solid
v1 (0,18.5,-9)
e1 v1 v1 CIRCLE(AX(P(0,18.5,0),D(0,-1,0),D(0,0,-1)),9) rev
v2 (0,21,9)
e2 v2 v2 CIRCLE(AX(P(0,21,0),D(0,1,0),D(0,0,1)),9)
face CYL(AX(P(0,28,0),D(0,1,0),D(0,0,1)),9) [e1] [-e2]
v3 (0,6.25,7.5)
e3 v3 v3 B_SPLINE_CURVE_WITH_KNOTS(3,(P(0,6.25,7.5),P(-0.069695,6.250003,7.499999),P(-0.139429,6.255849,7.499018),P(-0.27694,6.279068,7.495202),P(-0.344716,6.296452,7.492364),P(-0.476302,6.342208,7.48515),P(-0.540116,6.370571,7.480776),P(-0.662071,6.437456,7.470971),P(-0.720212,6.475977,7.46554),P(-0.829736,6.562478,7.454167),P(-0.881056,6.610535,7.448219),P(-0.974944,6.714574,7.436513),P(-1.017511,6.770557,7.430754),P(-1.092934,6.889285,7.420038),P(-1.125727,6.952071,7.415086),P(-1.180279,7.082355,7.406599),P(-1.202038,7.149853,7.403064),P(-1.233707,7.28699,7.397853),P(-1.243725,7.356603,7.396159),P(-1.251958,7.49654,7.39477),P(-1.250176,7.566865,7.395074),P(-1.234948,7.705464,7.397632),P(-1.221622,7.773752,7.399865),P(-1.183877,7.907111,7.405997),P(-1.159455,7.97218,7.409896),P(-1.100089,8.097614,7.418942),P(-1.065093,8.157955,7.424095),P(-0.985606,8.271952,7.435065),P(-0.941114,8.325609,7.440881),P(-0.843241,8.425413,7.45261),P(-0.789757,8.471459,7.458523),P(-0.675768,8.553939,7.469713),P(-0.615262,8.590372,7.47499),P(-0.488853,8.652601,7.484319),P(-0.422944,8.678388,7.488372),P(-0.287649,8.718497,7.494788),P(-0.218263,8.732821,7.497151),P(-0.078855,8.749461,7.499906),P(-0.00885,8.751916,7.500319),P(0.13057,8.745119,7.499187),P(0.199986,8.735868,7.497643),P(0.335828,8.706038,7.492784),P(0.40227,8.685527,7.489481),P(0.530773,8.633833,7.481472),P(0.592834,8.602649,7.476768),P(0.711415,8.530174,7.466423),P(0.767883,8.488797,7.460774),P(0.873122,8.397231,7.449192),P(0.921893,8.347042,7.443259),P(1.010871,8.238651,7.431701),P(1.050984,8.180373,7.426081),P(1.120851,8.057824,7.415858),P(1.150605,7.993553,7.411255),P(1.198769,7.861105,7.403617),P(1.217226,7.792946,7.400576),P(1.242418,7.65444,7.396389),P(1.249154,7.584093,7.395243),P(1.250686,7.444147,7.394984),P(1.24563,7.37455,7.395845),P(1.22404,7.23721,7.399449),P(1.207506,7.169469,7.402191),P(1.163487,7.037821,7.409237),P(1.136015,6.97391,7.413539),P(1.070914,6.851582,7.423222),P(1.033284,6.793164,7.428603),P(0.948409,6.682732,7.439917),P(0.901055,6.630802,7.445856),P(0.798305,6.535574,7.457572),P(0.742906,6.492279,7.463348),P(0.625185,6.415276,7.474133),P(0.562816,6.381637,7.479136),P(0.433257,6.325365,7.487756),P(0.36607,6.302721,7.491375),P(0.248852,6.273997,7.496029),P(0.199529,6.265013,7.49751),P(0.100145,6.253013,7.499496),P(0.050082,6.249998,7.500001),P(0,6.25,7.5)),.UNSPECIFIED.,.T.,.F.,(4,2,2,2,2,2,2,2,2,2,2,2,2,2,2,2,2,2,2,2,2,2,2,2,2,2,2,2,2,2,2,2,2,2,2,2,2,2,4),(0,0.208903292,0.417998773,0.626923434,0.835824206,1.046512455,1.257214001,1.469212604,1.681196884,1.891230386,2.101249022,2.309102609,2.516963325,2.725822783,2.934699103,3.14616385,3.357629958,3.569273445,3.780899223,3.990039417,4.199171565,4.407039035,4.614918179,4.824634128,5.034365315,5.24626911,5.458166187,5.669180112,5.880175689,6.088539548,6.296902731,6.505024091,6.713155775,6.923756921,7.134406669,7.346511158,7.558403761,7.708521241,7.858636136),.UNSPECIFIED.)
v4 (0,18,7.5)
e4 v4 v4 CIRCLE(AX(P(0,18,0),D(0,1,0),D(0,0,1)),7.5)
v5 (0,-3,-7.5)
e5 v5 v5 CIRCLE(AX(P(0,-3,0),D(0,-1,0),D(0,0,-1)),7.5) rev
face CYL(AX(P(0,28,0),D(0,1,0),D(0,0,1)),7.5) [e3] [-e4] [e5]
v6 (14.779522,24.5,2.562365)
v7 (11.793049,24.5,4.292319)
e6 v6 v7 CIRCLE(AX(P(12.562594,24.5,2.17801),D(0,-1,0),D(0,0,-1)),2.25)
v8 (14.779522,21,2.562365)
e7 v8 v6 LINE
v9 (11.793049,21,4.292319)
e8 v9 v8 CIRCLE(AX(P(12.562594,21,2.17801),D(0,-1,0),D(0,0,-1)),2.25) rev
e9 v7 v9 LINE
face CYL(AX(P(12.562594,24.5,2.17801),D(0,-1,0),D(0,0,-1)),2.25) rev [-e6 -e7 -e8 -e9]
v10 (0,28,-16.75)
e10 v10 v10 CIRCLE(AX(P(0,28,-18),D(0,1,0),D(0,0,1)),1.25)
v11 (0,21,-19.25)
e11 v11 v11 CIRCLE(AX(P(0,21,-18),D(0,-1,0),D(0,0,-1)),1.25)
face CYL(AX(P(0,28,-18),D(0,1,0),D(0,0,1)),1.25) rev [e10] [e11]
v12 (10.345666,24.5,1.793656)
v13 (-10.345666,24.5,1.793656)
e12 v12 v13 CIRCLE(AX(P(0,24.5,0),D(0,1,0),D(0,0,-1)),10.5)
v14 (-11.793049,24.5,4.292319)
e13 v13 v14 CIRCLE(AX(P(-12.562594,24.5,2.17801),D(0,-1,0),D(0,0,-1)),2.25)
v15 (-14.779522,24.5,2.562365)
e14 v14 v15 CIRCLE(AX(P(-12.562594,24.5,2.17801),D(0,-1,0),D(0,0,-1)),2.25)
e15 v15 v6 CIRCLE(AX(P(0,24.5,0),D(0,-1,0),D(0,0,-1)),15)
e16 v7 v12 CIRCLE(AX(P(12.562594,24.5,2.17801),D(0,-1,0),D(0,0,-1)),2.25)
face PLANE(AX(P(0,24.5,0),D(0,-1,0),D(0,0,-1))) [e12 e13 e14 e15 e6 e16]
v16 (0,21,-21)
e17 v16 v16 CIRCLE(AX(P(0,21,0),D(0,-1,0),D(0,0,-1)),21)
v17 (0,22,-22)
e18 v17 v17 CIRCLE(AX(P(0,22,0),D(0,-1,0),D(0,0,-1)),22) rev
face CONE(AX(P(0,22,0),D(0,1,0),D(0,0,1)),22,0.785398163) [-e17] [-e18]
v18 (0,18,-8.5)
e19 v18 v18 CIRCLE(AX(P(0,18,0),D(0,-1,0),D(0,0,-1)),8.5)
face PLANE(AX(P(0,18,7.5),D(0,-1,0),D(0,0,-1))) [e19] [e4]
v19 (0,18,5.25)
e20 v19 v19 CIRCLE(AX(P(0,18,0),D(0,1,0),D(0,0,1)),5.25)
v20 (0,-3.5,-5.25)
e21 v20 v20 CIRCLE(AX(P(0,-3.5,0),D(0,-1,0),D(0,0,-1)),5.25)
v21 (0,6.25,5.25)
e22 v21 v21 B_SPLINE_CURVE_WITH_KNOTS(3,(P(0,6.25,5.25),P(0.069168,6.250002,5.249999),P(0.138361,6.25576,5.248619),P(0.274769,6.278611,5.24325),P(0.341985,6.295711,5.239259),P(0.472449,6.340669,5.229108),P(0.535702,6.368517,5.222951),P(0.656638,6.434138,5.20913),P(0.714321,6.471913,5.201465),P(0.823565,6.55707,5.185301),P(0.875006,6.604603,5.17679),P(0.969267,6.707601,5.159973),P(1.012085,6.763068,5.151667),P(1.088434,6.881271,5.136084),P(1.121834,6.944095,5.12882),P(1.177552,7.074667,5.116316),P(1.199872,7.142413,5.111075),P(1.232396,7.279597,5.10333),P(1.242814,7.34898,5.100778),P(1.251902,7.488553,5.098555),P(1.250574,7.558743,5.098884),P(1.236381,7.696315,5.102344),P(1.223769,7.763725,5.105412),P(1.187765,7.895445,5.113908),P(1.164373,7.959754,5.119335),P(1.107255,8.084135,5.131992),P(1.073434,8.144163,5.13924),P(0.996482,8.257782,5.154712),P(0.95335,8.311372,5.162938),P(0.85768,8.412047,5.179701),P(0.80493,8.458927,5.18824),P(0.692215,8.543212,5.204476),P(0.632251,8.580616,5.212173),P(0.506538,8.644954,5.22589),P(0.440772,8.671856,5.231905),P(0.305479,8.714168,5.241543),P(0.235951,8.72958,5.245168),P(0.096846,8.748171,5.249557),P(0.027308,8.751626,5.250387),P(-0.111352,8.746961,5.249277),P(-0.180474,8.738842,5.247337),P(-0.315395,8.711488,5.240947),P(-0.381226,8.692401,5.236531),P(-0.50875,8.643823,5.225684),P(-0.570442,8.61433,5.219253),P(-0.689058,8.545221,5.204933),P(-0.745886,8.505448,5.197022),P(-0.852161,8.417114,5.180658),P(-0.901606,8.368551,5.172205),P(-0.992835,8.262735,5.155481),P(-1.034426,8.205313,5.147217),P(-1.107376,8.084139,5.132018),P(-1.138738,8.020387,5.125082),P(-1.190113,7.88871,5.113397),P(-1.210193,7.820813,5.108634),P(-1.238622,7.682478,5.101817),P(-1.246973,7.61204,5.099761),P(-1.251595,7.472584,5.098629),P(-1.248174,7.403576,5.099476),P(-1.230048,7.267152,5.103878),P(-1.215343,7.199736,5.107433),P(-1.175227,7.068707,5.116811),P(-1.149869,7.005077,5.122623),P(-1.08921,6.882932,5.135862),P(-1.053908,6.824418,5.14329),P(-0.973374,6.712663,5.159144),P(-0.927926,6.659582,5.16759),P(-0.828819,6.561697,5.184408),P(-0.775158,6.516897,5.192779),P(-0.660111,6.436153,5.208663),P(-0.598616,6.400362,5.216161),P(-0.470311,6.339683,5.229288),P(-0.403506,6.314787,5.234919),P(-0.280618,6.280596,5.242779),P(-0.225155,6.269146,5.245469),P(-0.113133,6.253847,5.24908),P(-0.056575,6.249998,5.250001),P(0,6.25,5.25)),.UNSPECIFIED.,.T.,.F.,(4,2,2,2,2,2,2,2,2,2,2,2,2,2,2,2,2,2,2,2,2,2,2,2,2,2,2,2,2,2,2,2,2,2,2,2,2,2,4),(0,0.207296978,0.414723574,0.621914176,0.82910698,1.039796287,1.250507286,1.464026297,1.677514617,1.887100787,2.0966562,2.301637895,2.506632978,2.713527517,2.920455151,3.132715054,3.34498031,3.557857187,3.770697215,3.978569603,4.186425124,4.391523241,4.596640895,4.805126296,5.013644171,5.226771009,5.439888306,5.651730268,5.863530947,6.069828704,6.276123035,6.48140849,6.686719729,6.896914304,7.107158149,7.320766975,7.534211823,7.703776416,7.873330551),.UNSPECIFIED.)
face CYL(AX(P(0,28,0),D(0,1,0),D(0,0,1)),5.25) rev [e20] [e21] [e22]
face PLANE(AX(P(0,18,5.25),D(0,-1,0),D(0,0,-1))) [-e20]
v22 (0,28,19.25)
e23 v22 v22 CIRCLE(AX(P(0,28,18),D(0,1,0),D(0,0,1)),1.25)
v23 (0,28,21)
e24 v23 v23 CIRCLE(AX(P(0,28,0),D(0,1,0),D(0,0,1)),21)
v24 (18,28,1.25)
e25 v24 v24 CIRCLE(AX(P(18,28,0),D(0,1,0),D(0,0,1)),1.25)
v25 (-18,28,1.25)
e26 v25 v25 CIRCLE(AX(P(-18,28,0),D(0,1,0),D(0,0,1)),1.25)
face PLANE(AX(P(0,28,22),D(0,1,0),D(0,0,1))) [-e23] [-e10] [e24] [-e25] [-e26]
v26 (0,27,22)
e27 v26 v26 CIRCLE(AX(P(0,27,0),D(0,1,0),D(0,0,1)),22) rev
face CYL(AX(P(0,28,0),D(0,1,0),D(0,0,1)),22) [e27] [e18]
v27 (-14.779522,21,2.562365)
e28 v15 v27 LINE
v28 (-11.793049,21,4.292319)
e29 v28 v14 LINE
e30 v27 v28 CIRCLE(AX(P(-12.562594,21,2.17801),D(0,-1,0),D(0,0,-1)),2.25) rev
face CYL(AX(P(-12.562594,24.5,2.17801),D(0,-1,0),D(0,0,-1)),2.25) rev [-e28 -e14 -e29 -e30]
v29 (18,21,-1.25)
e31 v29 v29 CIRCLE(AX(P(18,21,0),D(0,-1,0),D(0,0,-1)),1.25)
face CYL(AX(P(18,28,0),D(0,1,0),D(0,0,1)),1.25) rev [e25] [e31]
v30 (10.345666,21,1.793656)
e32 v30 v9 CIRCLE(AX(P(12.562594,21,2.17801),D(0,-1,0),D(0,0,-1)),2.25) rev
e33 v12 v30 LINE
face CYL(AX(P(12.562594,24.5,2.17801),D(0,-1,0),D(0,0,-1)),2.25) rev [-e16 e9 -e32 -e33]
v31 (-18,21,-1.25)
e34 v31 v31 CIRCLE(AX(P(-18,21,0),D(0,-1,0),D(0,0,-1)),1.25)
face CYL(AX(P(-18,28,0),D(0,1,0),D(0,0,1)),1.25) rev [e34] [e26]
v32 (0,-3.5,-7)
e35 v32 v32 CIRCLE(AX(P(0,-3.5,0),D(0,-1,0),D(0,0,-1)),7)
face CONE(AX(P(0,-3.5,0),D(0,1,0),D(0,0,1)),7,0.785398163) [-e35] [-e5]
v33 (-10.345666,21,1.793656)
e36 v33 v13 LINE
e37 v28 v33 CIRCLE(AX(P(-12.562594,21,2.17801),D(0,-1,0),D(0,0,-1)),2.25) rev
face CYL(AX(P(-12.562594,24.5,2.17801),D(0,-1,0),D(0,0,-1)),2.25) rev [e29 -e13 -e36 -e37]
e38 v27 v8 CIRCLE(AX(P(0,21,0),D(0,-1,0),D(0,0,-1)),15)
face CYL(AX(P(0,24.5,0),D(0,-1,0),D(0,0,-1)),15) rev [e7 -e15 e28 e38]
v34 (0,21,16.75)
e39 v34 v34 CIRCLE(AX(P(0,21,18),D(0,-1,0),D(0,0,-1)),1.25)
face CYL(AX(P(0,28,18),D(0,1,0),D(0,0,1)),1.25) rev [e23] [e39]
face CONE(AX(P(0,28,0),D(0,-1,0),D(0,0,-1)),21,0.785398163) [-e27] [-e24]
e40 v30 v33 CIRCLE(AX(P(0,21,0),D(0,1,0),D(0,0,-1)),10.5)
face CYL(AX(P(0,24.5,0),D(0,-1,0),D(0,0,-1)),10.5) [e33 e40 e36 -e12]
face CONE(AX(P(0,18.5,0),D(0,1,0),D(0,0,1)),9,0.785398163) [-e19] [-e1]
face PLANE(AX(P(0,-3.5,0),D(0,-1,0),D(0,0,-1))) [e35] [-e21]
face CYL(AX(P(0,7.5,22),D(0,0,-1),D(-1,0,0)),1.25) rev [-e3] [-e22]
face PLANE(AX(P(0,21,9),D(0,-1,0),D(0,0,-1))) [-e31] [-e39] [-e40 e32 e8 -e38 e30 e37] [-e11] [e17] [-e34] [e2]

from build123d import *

# Parameters (mm, degrees)
SKETCH_5_R             = 7.5
SKETCH_5_R_2           = 5.25
EXTRUDE_1_DEPTH        = 3.5
SKETCH_6_R             = 1.25
CUT_EXTRUDE_M3_1_DEPTH = 42.856899073
CHAMFER_1_SIZE         = 0.5
CHAMFER_2_SIZE         = 1
CUT_EXTRUDE_14_DEPTH   = 3.5
FILLET_2_R             = 2.25
HOLE_WIZARD_M3_1_D     = 2.5


with BuildPart() as part:
    # 草图1 → 旋转1 (revolve)
    with BuildSketch(Plane(origin=(0, 0, 0), x_dir=(0, 0, -1), z_dir=(1, 0, 0))):
        Polygon((-7.5, 0), (-5.25, 0), (-5.25, 18), (0, 18), (0, 28), (-22, 28), (-22, 21), (-9, 21), (-9, 18), (-7.5, 18), align=None)
    revolve(axis=Axis((0, 28, 0), (0, -1, 0)))

    # 草图5 → 凸台-拉伸1 (add)
    with BuildSketch(Plane.XZ):
        with Locations(Location((0, 0, 0), (0, 0, 90))):
            Circle(SKETCH_5_R)
        with Locations(Location((0, 0, 0), (0, 0, 90))):
            Circle(SKETCH_5_R_2, mode=Mode.SUBTRACT)
    extrude(amount=EXTRUDE_1_DEPTH)

    # 草图6 → M3螺纹孔1 (cut, through all)
    with BuildSketch(Plane.XY):
        with Locations(Location((0, 7.5, 0), (0, 0, 270))):
            Circle(SKETCH_6_R)
    extrude(amount=CUT_EXTRUDE_M3_1_DEPTH, mode=Mode.SUBTRACT)

    # 倒角1
    chamfer_1_edges = [part.edges().sort_by_distance(p)[0] for p in [
        (0, -3.5, -7.5),
        (0, 18, -9),
    ]]
    chamfer(chamfer_1_edges, length=CHAMFER_1_SIZE)

    # 倒角2
    chamfer_2_edges = [part.edges().sort_by_distance(p)[0] for p in [
        (0, 28, -22),
        (0, 21, -22),
    ]]
    chamfer(chamfer_2_edges, length=CHAMFER_2_SIZE)

    # 草图8 → 切除-拉伸14 (cut)
    with BuildSketch(Plane.XZ.offset(-21)):
        with BuildLine():
            Line((-9.866772518, 3.591211505), (-14.095389312, 5.13030215))
            ThreePointArc((-14.095389312, 5.13030215), (0, -15), (14.095389312, 5.13030215))
            Line((14.095389312, 5.13030215), (9.866772518, 3.591211505))
            ThreePointArc((9.866772518, 3.591211505), (0, -10.5), (-9.866772518, 3.591211505))
        make_face()
    extrude(amount=-CUT_EXTRUDE_14_DEPTH, mode=Mode.SUBTRACT)

    # 圆角2
    fillet_2_edges = [part.edges().sort_by_distance(p)[0] for p in [
        (9.866772518, 22.75, 3.591211505),
        (14.095389312, 22.75, 5.13030215),
        (-9.866772518, 22.75, 3.591211505),
        (-14.095389312, 22.75, 5.13030215),
    ]]
    fillet(fillet_2_edges, radius=FILLET_2_R - 0.0001)  # a hair under: the kernel refuses the full size

    # M3 螺纹孔1 (through all)
    with Locations(Plane(origin=(0, 28, -18), x_dir=(0, 0, 1), z_dir=(0, 1, 0))):
        with Locations((0, 0), (18, 18), (36, 0), (18, -18)):
            Hole(HOLE_WIZARD_M3_1_D / 2)


solid = part.part
